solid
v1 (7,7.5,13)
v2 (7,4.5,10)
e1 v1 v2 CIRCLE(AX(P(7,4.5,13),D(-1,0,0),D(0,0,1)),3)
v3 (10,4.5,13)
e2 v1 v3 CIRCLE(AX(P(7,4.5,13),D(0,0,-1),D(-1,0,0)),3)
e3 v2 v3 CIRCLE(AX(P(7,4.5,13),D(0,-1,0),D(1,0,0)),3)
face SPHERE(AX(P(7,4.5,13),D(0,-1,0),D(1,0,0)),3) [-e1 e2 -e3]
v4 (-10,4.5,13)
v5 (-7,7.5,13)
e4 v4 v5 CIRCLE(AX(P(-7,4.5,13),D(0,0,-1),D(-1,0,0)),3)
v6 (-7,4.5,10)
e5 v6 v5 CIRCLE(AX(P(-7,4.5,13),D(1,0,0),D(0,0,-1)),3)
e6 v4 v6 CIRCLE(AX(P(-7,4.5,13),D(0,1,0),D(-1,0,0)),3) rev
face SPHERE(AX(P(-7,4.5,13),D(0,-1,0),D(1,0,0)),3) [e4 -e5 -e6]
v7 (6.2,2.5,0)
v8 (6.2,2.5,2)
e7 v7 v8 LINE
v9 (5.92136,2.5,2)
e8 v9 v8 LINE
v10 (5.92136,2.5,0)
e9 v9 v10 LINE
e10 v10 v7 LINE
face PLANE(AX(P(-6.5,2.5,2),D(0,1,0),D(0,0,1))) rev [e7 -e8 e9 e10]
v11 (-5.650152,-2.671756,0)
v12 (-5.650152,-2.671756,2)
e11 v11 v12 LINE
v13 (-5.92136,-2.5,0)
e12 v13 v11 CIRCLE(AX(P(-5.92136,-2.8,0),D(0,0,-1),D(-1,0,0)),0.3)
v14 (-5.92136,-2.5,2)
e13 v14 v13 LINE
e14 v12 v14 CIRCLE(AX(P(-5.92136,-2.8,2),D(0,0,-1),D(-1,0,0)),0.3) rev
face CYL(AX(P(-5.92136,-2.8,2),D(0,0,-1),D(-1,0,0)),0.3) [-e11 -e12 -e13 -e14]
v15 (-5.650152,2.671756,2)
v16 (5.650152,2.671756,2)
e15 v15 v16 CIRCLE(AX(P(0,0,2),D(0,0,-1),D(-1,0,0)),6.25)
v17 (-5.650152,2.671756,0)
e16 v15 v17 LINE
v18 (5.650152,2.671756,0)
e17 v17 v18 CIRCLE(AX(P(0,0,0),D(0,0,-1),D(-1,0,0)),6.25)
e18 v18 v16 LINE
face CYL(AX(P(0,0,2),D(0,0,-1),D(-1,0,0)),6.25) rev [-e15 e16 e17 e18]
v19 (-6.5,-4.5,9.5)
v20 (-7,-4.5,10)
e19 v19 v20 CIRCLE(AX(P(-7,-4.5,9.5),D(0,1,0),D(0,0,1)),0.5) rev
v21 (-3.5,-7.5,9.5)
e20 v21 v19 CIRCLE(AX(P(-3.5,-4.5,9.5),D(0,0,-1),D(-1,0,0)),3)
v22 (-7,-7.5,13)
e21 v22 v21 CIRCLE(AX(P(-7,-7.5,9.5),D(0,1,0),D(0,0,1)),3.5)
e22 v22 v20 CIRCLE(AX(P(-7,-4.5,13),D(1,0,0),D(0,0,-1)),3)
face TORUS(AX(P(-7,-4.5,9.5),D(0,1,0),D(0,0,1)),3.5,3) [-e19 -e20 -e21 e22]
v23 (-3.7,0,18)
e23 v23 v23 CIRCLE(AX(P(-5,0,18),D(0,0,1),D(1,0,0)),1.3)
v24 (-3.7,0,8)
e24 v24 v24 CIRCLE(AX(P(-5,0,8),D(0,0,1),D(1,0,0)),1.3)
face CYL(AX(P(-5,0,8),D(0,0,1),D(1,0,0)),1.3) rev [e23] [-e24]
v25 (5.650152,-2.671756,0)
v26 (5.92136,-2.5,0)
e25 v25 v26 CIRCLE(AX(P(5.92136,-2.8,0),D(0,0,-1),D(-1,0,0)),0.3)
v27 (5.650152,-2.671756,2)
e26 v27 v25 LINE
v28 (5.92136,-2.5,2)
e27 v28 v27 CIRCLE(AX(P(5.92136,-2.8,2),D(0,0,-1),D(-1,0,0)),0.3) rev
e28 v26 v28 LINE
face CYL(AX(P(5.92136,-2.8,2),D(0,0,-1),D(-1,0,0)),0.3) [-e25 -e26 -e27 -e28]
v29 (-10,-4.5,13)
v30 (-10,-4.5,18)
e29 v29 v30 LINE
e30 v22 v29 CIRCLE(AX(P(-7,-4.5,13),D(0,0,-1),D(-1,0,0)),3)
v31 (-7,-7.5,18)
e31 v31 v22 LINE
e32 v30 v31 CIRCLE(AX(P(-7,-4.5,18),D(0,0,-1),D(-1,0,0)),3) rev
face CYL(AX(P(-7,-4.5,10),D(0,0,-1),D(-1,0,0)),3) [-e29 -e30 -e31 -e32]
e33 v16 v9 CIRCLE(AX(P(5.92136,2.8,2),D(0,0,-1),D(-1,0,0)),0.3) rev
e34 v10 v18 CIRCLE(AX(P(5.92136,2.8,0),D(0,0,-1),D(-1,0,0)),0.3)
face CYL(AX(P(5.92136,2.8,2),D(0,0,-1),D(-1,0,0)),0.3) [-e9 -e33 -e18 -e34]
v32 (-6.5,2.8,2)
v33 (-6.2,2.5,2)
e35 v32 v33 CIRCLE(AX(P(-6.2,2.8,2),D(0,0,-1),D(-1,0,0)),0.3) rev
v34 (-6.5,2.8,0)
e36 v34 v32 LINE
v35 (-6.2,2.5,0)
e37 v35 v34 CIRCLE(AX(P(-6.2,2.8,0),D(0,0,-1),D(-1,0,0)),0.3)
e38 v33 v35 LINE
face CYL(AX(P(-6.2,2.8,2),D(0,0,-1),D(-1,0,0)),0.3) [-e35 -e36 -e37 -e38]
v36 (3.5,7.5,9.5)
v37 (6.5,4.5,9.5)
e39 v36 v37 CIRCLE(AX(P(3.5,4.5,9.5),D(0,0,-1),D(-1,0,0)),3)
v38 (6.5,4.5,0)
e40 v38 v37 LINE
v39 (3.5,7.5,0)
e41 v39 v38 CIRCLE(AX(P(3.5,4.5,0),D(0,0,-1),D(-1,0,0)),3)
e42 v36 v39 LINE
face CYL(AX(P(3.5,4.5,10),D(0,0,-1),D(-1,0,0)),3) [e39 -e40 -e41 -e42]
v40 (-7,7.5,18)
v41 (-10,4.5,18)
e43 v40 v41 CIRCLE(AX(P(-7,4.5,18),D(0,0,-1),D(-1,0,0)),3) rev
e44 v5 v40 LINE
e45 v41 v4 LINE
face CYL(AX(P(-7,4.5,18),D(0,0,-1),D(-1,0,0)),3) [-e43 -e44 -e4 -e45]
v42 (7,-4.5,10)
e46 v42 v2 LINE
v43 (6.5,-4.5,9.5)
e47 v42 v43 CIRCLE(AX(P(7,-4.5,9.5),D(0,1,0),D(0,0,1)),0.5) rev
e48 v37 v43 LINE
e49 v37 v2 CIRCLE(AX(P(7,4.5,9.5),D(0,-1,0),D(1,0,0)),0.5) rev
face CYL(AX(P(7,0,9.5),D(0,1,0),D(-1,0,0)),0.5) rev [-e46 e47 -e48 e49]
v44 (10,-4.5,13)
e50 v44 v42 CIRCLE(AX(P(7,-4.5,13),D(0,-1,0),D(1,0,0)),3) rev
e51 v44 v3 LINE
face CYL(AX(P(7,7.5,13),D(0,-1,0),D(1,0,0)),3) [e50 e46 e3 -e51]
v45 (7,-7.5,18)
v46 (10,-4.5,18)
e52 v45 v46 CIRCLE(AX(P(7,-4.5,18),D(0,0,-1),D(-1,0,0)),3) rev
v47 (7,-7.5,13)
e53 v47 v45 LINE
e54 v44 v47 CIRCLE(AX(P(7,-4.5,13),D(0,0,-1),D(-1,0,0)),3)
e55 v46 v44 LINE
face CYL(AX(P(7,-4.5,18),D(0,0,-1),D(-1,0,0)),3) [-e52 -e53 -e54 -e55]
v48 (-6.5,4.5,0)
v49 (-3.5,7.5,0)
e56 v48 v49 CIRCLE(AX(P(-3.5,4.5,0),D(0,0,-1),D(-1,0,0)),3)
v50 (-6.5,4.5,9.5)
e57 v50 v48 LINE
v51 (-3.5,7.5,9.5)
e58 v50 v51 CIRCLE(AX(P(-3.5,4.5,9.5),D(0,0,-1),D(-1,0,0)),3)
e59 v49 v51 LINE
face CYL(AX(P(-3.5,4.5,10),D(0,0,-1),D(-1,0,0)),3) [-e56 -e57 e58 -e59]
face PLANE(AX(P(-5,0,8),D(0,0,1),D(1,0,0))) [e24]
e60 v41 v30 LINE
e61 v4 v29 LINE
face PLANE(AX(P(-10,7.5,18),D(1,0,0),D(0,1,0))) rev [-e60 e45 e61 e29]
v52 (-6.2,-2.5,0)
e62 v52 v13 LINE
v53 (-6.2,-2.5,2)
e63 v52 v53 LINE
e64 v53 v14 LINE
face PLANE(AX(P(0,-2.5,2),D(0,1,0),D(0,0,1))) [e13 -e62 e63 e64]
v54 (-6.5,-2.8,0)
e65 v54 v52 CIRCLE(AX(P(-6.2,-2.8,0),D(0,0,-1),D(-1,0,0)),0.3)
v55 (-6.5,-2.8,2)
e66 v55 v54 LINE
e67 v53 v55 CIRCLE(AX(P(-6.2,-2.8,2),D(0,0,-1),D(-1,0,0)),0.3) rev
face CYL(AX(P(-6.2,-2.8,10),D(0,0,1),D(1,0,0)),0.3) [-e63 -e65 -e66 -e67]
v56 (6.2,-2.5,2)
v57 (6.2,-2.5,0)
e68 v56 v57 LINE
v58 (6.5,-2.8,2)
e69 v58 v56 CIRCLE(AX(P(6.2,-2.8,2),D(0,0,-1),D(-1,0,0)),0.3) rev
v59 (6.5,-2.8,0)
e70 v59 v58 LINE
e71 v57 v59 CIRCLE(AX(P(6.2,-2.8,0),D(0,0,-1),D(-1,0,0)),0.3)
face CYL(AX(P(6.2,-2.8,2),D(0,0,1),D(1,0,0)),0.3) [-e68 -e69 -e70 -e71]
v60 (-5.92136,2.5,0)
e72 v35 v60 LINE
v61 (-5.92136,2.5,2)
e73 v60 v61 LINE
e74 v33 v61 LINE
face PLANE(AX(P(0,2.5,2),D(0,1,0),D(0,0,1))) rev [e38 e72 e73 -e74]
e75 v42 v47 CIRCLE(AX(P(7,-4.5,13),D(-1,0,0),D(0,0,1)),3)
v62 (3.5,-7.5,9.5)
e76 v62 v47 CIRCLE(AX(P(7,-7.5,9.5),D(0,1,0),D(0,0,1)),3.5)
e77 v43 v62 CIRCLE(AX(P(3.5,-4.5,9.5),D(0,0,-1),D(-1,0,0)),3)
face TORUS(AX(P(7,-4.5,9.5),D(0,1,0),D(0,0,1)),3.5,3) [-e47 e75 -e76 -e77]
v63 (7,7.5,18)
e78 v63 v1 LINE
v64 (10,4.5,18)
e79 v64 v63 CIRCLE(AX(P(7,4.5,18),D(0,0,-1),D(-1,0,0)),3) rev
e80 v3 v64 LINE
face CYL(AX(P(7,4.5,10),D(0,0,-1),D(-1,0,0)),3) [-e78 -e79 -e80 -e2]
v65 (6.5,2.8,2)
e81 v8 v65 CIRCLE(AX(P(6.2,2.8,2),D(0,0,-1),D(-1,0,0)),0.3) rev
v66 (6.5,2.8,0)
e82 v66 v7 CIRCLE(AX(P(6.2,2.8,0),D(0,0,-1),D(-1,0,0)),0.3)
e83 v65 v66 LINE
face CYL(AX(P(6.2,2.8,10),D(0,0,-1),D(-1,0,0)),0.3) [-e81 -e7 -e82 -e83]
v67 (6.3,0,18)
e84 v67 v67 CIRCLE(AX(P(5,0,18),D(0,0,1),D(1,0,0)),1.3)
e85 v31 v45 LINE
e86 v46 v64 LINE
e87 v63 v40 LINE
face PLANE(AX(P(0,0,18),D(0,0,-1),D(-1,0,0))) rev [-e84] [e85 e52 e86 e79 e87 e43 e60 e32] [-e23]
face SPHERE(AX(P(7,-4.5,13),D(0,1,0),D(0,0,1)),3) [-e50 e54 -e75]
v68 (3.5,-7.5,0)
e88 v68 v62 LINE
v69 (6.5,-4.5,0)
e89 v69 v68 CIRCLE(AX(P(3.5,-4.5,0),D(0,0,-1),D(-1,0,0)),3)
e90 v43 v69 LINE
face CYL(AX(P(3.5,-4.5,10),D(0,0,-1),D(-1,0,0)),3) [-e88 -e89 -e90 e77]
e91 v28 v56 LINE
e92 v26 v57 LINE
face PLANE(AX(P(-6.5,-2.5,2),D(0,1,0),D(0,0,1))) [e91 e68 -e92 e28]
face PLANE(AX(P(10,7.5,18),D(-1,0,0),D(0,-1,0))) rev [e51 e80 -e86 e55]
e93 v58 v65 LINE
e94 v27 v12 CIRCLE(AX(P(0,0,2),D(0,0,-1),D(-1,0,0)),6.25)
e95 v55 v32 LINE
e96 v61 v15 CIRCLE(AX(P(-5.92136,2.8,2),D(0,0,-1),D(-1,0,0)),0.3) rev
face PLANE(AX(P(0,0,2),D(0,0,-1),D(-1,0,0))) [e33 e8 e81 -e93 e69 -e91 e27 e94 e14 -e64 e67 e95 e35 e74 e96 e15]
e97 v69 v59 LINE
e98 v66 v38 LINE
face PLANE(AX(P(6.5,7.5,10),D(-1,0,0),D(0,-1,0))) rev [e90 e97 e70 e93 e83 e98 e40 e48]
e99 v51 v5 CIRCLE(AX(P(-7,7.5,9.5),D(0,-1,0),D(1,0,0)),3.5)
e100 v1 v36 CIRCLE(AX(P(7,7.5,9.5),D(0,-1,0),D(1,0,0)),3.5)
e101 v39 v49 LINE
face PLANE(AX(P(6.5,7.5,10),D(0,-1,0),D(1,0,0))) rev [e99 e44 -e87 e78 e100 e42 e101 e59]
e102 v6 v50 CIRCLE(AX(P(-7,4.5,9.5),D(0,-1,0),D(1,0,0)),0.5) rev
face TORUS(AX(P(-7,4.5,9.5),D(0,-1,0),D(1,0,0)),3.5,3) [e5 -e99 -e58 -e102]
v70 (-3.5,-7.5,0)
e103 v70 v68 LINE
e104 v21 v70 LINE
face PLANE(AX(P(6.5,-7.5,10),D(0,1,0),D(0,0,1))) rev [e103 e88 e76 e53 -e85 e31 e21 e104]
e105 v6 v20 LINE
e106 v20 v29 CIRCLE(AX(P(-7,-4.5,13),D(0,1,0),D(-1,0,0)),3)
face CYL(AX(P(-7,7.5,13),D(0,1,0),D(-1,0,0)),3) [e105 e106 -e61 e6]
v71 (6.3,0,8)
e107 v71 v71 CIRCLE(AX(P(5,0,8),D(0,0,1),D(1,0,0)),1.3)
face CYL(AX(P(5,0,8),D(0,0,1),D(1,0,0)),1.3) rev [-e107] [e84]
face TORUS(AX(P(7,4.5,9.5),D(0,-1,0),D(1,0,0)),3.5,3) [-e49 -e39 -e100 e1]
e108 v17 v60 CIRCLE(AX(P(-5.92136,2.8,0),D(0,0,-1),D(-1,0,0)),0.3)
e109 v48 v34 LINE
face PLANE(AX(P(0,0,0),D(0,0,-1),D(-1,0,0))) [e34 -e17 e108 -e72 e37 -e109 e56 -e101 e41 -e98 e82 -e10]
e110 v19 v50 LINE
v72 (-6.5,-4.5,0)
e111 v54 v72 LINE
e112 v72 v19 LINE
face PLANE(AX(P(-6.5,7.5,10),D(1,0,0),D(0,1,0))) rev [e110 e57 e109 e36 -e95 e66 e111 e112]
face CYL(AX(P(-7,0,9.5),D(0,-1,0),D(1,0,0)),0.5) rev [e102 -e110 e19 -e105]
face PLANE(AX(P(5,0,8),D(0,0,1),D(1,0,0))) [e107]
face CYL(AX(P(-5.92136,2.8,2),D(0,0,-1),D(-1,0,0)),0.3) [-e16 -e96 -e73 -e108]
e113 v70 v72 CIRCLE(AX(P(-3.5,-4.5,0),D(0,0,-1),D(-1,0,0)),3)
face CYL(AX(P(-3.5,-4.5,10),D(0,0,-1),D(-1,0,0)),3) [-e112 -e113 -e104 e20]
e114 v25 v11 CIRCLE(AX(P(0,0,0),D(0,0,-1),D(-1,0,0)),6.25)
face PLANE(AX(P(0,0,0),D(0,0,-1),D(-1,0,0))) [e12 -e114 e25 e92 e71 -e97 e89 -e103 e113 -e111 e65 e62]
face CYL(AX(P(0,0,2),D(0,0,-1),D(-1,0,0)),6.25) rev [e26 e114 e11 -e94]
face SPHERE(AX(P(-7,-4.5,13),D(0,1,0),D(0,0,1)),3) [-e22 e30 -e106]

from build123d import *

# Parameters (mm, degrees)
SKETCH_1_W          = 13
SKETCH_1_H          = 15
EXTRUDE_1_DEPTH     = 10
SKETCH_2_W          = 20
SKETCH_2_H          = 15
EXTRUDE_2_DEPTH     = 8
SKETCH_6_R          = 6.25
SKETCH_6_W          = 13
SKETCH_6_H          = 5
CUT_EXTRUDE_3_DEPTH = 2
SKETCH_8_R          = 1.3
CUT_EXTRUDE_5_DEPTH = 10
FILLET_7_R          = 0.5
FILLET_8_R          = 3
FILLET_9_R          = 3
FILLET_10_R         = 0.3


with BuildPart() as part:
    # ｽｹｯﾁ1 → ﾎﾞｽ - 押し出し1 (new body)
    with BuildSketch(Plane.XY):
        Rectangle(SKETCH_1_W, SKETCH_1_H)
    extrude(amount=EXTRUDE_1_DEPTH)

    # ｽｹｯﾁ2 → ﾎﾞｽ - 押し出し2 (add)
    with BuildSketch(Plane.XY.offset(10)):
        Rectangle(SKETCH_2_W, SKETCH_2_H)
    extrude(amount=EXTRUDE_2_DEPTH)

    # ｽｹｯﾁ6 → ｶｯﾄ - 押し出し3 (cut)
    with BuildSketch(Plane(origin=(0, 0, 0), x_dir=(-1, 0, 0), z_dir=(0, 0, -1))):
        Circle(SKETCH_6_R)
        Rectangle(SKETCH_6_W, SKETCH_6_H)
    extrude(amount=-CUT_EXTRUDE_3_DEPTH, mode=Mode.SUBTRACT)

    # ｽｹｯﾁ8 → ｶｯﾄ - 押し出し5 (cut)
    with BuildSketch(Plane.XY.offset(18)):
        with Locations((-5, 0)):
            Circle(SKETCH_8_R)
        with Locations((5, 0)):
            Circle(SKETCH_8_R)
    extrude(amount=-CUT_EXTRUDE_5_DEPTH, mode=Mode.SUBTRACT)

    # ﾌｨﾚｯﾄ7
    fillet_7_edges = [part.edges().sort_by_distance(p)[0] for p in [
        (6.5, 0, 10),
        (-6.5, 0, 10),
    ]]
    fillet(fillet_7_edges, radius=FILLET_7_R)

    # ﾌｨﾚｯﾄ8
    fillet_8_edges = [part.edges().sort_by_distance(p)[0] for p in [
        (10, 0, 10),
        (-10, 0, 10),
    ]]
    fillet(fillet_8_edges, radius=FILLET_8_R - 0.0001)  # a hair under: the kernel refuses the full size

    # ﾌｨﾚｯﾄ9
    fillet_9_edges = [part.edges().sort_by_distance(p)[0] for p in [
        (-10, 7.5, 15.49995),
        (-10, -7.5, 15.49995),
        (10, -7.5, 15.49995),
        (10, 7.5, 15.49995),
        (-6.5, -7.5, 4.75),
        (-6.5, 7.5, 4.75),
        (6.5, 7.5, 4.75),
        (6.5, -7.5, 4.75),
        (-6.646446609, -7.5, 9.853553391),
        (-6.646446609, 7.5, 9.853553391),
        (6.646446609, 7.5, 9.853553391),
        (6.646446609, -7.5, 9.853553391),
        (-9.121349633, 7.5, 10.878650367),
        (9.121349633, 7.5, 10.878650367),
        (-9.121349633, -7.5, 10.878650367),
        (9.121349633, -7.5, 10.878650367),
    ]]
    fillet(fillet_9_edges, radius=FILLET_9_R - 0.0001)  # a hair under: the kernel refuses the full size

    # ﾌｨﾚｯﾄ10
    fillet_10_edges = [part.edges().sort_by_distance(p)[0] for p in [
        (-6.5, 2.5, 1),
        (-5.728219619, 2.5, 1),
        (-6.5, -2.5, 1),
        (5.728219619, -2.5, 1),
        (-5.728219619, -2.5, 1),
        (6.5, -2.5, 1),
        (5.728219619, 2.5, 1),
        (6.5, 2.5, 1),
    ]]
    fillet(fillet_10_edges, radius=FILLET_10_R)


solid = part.part
